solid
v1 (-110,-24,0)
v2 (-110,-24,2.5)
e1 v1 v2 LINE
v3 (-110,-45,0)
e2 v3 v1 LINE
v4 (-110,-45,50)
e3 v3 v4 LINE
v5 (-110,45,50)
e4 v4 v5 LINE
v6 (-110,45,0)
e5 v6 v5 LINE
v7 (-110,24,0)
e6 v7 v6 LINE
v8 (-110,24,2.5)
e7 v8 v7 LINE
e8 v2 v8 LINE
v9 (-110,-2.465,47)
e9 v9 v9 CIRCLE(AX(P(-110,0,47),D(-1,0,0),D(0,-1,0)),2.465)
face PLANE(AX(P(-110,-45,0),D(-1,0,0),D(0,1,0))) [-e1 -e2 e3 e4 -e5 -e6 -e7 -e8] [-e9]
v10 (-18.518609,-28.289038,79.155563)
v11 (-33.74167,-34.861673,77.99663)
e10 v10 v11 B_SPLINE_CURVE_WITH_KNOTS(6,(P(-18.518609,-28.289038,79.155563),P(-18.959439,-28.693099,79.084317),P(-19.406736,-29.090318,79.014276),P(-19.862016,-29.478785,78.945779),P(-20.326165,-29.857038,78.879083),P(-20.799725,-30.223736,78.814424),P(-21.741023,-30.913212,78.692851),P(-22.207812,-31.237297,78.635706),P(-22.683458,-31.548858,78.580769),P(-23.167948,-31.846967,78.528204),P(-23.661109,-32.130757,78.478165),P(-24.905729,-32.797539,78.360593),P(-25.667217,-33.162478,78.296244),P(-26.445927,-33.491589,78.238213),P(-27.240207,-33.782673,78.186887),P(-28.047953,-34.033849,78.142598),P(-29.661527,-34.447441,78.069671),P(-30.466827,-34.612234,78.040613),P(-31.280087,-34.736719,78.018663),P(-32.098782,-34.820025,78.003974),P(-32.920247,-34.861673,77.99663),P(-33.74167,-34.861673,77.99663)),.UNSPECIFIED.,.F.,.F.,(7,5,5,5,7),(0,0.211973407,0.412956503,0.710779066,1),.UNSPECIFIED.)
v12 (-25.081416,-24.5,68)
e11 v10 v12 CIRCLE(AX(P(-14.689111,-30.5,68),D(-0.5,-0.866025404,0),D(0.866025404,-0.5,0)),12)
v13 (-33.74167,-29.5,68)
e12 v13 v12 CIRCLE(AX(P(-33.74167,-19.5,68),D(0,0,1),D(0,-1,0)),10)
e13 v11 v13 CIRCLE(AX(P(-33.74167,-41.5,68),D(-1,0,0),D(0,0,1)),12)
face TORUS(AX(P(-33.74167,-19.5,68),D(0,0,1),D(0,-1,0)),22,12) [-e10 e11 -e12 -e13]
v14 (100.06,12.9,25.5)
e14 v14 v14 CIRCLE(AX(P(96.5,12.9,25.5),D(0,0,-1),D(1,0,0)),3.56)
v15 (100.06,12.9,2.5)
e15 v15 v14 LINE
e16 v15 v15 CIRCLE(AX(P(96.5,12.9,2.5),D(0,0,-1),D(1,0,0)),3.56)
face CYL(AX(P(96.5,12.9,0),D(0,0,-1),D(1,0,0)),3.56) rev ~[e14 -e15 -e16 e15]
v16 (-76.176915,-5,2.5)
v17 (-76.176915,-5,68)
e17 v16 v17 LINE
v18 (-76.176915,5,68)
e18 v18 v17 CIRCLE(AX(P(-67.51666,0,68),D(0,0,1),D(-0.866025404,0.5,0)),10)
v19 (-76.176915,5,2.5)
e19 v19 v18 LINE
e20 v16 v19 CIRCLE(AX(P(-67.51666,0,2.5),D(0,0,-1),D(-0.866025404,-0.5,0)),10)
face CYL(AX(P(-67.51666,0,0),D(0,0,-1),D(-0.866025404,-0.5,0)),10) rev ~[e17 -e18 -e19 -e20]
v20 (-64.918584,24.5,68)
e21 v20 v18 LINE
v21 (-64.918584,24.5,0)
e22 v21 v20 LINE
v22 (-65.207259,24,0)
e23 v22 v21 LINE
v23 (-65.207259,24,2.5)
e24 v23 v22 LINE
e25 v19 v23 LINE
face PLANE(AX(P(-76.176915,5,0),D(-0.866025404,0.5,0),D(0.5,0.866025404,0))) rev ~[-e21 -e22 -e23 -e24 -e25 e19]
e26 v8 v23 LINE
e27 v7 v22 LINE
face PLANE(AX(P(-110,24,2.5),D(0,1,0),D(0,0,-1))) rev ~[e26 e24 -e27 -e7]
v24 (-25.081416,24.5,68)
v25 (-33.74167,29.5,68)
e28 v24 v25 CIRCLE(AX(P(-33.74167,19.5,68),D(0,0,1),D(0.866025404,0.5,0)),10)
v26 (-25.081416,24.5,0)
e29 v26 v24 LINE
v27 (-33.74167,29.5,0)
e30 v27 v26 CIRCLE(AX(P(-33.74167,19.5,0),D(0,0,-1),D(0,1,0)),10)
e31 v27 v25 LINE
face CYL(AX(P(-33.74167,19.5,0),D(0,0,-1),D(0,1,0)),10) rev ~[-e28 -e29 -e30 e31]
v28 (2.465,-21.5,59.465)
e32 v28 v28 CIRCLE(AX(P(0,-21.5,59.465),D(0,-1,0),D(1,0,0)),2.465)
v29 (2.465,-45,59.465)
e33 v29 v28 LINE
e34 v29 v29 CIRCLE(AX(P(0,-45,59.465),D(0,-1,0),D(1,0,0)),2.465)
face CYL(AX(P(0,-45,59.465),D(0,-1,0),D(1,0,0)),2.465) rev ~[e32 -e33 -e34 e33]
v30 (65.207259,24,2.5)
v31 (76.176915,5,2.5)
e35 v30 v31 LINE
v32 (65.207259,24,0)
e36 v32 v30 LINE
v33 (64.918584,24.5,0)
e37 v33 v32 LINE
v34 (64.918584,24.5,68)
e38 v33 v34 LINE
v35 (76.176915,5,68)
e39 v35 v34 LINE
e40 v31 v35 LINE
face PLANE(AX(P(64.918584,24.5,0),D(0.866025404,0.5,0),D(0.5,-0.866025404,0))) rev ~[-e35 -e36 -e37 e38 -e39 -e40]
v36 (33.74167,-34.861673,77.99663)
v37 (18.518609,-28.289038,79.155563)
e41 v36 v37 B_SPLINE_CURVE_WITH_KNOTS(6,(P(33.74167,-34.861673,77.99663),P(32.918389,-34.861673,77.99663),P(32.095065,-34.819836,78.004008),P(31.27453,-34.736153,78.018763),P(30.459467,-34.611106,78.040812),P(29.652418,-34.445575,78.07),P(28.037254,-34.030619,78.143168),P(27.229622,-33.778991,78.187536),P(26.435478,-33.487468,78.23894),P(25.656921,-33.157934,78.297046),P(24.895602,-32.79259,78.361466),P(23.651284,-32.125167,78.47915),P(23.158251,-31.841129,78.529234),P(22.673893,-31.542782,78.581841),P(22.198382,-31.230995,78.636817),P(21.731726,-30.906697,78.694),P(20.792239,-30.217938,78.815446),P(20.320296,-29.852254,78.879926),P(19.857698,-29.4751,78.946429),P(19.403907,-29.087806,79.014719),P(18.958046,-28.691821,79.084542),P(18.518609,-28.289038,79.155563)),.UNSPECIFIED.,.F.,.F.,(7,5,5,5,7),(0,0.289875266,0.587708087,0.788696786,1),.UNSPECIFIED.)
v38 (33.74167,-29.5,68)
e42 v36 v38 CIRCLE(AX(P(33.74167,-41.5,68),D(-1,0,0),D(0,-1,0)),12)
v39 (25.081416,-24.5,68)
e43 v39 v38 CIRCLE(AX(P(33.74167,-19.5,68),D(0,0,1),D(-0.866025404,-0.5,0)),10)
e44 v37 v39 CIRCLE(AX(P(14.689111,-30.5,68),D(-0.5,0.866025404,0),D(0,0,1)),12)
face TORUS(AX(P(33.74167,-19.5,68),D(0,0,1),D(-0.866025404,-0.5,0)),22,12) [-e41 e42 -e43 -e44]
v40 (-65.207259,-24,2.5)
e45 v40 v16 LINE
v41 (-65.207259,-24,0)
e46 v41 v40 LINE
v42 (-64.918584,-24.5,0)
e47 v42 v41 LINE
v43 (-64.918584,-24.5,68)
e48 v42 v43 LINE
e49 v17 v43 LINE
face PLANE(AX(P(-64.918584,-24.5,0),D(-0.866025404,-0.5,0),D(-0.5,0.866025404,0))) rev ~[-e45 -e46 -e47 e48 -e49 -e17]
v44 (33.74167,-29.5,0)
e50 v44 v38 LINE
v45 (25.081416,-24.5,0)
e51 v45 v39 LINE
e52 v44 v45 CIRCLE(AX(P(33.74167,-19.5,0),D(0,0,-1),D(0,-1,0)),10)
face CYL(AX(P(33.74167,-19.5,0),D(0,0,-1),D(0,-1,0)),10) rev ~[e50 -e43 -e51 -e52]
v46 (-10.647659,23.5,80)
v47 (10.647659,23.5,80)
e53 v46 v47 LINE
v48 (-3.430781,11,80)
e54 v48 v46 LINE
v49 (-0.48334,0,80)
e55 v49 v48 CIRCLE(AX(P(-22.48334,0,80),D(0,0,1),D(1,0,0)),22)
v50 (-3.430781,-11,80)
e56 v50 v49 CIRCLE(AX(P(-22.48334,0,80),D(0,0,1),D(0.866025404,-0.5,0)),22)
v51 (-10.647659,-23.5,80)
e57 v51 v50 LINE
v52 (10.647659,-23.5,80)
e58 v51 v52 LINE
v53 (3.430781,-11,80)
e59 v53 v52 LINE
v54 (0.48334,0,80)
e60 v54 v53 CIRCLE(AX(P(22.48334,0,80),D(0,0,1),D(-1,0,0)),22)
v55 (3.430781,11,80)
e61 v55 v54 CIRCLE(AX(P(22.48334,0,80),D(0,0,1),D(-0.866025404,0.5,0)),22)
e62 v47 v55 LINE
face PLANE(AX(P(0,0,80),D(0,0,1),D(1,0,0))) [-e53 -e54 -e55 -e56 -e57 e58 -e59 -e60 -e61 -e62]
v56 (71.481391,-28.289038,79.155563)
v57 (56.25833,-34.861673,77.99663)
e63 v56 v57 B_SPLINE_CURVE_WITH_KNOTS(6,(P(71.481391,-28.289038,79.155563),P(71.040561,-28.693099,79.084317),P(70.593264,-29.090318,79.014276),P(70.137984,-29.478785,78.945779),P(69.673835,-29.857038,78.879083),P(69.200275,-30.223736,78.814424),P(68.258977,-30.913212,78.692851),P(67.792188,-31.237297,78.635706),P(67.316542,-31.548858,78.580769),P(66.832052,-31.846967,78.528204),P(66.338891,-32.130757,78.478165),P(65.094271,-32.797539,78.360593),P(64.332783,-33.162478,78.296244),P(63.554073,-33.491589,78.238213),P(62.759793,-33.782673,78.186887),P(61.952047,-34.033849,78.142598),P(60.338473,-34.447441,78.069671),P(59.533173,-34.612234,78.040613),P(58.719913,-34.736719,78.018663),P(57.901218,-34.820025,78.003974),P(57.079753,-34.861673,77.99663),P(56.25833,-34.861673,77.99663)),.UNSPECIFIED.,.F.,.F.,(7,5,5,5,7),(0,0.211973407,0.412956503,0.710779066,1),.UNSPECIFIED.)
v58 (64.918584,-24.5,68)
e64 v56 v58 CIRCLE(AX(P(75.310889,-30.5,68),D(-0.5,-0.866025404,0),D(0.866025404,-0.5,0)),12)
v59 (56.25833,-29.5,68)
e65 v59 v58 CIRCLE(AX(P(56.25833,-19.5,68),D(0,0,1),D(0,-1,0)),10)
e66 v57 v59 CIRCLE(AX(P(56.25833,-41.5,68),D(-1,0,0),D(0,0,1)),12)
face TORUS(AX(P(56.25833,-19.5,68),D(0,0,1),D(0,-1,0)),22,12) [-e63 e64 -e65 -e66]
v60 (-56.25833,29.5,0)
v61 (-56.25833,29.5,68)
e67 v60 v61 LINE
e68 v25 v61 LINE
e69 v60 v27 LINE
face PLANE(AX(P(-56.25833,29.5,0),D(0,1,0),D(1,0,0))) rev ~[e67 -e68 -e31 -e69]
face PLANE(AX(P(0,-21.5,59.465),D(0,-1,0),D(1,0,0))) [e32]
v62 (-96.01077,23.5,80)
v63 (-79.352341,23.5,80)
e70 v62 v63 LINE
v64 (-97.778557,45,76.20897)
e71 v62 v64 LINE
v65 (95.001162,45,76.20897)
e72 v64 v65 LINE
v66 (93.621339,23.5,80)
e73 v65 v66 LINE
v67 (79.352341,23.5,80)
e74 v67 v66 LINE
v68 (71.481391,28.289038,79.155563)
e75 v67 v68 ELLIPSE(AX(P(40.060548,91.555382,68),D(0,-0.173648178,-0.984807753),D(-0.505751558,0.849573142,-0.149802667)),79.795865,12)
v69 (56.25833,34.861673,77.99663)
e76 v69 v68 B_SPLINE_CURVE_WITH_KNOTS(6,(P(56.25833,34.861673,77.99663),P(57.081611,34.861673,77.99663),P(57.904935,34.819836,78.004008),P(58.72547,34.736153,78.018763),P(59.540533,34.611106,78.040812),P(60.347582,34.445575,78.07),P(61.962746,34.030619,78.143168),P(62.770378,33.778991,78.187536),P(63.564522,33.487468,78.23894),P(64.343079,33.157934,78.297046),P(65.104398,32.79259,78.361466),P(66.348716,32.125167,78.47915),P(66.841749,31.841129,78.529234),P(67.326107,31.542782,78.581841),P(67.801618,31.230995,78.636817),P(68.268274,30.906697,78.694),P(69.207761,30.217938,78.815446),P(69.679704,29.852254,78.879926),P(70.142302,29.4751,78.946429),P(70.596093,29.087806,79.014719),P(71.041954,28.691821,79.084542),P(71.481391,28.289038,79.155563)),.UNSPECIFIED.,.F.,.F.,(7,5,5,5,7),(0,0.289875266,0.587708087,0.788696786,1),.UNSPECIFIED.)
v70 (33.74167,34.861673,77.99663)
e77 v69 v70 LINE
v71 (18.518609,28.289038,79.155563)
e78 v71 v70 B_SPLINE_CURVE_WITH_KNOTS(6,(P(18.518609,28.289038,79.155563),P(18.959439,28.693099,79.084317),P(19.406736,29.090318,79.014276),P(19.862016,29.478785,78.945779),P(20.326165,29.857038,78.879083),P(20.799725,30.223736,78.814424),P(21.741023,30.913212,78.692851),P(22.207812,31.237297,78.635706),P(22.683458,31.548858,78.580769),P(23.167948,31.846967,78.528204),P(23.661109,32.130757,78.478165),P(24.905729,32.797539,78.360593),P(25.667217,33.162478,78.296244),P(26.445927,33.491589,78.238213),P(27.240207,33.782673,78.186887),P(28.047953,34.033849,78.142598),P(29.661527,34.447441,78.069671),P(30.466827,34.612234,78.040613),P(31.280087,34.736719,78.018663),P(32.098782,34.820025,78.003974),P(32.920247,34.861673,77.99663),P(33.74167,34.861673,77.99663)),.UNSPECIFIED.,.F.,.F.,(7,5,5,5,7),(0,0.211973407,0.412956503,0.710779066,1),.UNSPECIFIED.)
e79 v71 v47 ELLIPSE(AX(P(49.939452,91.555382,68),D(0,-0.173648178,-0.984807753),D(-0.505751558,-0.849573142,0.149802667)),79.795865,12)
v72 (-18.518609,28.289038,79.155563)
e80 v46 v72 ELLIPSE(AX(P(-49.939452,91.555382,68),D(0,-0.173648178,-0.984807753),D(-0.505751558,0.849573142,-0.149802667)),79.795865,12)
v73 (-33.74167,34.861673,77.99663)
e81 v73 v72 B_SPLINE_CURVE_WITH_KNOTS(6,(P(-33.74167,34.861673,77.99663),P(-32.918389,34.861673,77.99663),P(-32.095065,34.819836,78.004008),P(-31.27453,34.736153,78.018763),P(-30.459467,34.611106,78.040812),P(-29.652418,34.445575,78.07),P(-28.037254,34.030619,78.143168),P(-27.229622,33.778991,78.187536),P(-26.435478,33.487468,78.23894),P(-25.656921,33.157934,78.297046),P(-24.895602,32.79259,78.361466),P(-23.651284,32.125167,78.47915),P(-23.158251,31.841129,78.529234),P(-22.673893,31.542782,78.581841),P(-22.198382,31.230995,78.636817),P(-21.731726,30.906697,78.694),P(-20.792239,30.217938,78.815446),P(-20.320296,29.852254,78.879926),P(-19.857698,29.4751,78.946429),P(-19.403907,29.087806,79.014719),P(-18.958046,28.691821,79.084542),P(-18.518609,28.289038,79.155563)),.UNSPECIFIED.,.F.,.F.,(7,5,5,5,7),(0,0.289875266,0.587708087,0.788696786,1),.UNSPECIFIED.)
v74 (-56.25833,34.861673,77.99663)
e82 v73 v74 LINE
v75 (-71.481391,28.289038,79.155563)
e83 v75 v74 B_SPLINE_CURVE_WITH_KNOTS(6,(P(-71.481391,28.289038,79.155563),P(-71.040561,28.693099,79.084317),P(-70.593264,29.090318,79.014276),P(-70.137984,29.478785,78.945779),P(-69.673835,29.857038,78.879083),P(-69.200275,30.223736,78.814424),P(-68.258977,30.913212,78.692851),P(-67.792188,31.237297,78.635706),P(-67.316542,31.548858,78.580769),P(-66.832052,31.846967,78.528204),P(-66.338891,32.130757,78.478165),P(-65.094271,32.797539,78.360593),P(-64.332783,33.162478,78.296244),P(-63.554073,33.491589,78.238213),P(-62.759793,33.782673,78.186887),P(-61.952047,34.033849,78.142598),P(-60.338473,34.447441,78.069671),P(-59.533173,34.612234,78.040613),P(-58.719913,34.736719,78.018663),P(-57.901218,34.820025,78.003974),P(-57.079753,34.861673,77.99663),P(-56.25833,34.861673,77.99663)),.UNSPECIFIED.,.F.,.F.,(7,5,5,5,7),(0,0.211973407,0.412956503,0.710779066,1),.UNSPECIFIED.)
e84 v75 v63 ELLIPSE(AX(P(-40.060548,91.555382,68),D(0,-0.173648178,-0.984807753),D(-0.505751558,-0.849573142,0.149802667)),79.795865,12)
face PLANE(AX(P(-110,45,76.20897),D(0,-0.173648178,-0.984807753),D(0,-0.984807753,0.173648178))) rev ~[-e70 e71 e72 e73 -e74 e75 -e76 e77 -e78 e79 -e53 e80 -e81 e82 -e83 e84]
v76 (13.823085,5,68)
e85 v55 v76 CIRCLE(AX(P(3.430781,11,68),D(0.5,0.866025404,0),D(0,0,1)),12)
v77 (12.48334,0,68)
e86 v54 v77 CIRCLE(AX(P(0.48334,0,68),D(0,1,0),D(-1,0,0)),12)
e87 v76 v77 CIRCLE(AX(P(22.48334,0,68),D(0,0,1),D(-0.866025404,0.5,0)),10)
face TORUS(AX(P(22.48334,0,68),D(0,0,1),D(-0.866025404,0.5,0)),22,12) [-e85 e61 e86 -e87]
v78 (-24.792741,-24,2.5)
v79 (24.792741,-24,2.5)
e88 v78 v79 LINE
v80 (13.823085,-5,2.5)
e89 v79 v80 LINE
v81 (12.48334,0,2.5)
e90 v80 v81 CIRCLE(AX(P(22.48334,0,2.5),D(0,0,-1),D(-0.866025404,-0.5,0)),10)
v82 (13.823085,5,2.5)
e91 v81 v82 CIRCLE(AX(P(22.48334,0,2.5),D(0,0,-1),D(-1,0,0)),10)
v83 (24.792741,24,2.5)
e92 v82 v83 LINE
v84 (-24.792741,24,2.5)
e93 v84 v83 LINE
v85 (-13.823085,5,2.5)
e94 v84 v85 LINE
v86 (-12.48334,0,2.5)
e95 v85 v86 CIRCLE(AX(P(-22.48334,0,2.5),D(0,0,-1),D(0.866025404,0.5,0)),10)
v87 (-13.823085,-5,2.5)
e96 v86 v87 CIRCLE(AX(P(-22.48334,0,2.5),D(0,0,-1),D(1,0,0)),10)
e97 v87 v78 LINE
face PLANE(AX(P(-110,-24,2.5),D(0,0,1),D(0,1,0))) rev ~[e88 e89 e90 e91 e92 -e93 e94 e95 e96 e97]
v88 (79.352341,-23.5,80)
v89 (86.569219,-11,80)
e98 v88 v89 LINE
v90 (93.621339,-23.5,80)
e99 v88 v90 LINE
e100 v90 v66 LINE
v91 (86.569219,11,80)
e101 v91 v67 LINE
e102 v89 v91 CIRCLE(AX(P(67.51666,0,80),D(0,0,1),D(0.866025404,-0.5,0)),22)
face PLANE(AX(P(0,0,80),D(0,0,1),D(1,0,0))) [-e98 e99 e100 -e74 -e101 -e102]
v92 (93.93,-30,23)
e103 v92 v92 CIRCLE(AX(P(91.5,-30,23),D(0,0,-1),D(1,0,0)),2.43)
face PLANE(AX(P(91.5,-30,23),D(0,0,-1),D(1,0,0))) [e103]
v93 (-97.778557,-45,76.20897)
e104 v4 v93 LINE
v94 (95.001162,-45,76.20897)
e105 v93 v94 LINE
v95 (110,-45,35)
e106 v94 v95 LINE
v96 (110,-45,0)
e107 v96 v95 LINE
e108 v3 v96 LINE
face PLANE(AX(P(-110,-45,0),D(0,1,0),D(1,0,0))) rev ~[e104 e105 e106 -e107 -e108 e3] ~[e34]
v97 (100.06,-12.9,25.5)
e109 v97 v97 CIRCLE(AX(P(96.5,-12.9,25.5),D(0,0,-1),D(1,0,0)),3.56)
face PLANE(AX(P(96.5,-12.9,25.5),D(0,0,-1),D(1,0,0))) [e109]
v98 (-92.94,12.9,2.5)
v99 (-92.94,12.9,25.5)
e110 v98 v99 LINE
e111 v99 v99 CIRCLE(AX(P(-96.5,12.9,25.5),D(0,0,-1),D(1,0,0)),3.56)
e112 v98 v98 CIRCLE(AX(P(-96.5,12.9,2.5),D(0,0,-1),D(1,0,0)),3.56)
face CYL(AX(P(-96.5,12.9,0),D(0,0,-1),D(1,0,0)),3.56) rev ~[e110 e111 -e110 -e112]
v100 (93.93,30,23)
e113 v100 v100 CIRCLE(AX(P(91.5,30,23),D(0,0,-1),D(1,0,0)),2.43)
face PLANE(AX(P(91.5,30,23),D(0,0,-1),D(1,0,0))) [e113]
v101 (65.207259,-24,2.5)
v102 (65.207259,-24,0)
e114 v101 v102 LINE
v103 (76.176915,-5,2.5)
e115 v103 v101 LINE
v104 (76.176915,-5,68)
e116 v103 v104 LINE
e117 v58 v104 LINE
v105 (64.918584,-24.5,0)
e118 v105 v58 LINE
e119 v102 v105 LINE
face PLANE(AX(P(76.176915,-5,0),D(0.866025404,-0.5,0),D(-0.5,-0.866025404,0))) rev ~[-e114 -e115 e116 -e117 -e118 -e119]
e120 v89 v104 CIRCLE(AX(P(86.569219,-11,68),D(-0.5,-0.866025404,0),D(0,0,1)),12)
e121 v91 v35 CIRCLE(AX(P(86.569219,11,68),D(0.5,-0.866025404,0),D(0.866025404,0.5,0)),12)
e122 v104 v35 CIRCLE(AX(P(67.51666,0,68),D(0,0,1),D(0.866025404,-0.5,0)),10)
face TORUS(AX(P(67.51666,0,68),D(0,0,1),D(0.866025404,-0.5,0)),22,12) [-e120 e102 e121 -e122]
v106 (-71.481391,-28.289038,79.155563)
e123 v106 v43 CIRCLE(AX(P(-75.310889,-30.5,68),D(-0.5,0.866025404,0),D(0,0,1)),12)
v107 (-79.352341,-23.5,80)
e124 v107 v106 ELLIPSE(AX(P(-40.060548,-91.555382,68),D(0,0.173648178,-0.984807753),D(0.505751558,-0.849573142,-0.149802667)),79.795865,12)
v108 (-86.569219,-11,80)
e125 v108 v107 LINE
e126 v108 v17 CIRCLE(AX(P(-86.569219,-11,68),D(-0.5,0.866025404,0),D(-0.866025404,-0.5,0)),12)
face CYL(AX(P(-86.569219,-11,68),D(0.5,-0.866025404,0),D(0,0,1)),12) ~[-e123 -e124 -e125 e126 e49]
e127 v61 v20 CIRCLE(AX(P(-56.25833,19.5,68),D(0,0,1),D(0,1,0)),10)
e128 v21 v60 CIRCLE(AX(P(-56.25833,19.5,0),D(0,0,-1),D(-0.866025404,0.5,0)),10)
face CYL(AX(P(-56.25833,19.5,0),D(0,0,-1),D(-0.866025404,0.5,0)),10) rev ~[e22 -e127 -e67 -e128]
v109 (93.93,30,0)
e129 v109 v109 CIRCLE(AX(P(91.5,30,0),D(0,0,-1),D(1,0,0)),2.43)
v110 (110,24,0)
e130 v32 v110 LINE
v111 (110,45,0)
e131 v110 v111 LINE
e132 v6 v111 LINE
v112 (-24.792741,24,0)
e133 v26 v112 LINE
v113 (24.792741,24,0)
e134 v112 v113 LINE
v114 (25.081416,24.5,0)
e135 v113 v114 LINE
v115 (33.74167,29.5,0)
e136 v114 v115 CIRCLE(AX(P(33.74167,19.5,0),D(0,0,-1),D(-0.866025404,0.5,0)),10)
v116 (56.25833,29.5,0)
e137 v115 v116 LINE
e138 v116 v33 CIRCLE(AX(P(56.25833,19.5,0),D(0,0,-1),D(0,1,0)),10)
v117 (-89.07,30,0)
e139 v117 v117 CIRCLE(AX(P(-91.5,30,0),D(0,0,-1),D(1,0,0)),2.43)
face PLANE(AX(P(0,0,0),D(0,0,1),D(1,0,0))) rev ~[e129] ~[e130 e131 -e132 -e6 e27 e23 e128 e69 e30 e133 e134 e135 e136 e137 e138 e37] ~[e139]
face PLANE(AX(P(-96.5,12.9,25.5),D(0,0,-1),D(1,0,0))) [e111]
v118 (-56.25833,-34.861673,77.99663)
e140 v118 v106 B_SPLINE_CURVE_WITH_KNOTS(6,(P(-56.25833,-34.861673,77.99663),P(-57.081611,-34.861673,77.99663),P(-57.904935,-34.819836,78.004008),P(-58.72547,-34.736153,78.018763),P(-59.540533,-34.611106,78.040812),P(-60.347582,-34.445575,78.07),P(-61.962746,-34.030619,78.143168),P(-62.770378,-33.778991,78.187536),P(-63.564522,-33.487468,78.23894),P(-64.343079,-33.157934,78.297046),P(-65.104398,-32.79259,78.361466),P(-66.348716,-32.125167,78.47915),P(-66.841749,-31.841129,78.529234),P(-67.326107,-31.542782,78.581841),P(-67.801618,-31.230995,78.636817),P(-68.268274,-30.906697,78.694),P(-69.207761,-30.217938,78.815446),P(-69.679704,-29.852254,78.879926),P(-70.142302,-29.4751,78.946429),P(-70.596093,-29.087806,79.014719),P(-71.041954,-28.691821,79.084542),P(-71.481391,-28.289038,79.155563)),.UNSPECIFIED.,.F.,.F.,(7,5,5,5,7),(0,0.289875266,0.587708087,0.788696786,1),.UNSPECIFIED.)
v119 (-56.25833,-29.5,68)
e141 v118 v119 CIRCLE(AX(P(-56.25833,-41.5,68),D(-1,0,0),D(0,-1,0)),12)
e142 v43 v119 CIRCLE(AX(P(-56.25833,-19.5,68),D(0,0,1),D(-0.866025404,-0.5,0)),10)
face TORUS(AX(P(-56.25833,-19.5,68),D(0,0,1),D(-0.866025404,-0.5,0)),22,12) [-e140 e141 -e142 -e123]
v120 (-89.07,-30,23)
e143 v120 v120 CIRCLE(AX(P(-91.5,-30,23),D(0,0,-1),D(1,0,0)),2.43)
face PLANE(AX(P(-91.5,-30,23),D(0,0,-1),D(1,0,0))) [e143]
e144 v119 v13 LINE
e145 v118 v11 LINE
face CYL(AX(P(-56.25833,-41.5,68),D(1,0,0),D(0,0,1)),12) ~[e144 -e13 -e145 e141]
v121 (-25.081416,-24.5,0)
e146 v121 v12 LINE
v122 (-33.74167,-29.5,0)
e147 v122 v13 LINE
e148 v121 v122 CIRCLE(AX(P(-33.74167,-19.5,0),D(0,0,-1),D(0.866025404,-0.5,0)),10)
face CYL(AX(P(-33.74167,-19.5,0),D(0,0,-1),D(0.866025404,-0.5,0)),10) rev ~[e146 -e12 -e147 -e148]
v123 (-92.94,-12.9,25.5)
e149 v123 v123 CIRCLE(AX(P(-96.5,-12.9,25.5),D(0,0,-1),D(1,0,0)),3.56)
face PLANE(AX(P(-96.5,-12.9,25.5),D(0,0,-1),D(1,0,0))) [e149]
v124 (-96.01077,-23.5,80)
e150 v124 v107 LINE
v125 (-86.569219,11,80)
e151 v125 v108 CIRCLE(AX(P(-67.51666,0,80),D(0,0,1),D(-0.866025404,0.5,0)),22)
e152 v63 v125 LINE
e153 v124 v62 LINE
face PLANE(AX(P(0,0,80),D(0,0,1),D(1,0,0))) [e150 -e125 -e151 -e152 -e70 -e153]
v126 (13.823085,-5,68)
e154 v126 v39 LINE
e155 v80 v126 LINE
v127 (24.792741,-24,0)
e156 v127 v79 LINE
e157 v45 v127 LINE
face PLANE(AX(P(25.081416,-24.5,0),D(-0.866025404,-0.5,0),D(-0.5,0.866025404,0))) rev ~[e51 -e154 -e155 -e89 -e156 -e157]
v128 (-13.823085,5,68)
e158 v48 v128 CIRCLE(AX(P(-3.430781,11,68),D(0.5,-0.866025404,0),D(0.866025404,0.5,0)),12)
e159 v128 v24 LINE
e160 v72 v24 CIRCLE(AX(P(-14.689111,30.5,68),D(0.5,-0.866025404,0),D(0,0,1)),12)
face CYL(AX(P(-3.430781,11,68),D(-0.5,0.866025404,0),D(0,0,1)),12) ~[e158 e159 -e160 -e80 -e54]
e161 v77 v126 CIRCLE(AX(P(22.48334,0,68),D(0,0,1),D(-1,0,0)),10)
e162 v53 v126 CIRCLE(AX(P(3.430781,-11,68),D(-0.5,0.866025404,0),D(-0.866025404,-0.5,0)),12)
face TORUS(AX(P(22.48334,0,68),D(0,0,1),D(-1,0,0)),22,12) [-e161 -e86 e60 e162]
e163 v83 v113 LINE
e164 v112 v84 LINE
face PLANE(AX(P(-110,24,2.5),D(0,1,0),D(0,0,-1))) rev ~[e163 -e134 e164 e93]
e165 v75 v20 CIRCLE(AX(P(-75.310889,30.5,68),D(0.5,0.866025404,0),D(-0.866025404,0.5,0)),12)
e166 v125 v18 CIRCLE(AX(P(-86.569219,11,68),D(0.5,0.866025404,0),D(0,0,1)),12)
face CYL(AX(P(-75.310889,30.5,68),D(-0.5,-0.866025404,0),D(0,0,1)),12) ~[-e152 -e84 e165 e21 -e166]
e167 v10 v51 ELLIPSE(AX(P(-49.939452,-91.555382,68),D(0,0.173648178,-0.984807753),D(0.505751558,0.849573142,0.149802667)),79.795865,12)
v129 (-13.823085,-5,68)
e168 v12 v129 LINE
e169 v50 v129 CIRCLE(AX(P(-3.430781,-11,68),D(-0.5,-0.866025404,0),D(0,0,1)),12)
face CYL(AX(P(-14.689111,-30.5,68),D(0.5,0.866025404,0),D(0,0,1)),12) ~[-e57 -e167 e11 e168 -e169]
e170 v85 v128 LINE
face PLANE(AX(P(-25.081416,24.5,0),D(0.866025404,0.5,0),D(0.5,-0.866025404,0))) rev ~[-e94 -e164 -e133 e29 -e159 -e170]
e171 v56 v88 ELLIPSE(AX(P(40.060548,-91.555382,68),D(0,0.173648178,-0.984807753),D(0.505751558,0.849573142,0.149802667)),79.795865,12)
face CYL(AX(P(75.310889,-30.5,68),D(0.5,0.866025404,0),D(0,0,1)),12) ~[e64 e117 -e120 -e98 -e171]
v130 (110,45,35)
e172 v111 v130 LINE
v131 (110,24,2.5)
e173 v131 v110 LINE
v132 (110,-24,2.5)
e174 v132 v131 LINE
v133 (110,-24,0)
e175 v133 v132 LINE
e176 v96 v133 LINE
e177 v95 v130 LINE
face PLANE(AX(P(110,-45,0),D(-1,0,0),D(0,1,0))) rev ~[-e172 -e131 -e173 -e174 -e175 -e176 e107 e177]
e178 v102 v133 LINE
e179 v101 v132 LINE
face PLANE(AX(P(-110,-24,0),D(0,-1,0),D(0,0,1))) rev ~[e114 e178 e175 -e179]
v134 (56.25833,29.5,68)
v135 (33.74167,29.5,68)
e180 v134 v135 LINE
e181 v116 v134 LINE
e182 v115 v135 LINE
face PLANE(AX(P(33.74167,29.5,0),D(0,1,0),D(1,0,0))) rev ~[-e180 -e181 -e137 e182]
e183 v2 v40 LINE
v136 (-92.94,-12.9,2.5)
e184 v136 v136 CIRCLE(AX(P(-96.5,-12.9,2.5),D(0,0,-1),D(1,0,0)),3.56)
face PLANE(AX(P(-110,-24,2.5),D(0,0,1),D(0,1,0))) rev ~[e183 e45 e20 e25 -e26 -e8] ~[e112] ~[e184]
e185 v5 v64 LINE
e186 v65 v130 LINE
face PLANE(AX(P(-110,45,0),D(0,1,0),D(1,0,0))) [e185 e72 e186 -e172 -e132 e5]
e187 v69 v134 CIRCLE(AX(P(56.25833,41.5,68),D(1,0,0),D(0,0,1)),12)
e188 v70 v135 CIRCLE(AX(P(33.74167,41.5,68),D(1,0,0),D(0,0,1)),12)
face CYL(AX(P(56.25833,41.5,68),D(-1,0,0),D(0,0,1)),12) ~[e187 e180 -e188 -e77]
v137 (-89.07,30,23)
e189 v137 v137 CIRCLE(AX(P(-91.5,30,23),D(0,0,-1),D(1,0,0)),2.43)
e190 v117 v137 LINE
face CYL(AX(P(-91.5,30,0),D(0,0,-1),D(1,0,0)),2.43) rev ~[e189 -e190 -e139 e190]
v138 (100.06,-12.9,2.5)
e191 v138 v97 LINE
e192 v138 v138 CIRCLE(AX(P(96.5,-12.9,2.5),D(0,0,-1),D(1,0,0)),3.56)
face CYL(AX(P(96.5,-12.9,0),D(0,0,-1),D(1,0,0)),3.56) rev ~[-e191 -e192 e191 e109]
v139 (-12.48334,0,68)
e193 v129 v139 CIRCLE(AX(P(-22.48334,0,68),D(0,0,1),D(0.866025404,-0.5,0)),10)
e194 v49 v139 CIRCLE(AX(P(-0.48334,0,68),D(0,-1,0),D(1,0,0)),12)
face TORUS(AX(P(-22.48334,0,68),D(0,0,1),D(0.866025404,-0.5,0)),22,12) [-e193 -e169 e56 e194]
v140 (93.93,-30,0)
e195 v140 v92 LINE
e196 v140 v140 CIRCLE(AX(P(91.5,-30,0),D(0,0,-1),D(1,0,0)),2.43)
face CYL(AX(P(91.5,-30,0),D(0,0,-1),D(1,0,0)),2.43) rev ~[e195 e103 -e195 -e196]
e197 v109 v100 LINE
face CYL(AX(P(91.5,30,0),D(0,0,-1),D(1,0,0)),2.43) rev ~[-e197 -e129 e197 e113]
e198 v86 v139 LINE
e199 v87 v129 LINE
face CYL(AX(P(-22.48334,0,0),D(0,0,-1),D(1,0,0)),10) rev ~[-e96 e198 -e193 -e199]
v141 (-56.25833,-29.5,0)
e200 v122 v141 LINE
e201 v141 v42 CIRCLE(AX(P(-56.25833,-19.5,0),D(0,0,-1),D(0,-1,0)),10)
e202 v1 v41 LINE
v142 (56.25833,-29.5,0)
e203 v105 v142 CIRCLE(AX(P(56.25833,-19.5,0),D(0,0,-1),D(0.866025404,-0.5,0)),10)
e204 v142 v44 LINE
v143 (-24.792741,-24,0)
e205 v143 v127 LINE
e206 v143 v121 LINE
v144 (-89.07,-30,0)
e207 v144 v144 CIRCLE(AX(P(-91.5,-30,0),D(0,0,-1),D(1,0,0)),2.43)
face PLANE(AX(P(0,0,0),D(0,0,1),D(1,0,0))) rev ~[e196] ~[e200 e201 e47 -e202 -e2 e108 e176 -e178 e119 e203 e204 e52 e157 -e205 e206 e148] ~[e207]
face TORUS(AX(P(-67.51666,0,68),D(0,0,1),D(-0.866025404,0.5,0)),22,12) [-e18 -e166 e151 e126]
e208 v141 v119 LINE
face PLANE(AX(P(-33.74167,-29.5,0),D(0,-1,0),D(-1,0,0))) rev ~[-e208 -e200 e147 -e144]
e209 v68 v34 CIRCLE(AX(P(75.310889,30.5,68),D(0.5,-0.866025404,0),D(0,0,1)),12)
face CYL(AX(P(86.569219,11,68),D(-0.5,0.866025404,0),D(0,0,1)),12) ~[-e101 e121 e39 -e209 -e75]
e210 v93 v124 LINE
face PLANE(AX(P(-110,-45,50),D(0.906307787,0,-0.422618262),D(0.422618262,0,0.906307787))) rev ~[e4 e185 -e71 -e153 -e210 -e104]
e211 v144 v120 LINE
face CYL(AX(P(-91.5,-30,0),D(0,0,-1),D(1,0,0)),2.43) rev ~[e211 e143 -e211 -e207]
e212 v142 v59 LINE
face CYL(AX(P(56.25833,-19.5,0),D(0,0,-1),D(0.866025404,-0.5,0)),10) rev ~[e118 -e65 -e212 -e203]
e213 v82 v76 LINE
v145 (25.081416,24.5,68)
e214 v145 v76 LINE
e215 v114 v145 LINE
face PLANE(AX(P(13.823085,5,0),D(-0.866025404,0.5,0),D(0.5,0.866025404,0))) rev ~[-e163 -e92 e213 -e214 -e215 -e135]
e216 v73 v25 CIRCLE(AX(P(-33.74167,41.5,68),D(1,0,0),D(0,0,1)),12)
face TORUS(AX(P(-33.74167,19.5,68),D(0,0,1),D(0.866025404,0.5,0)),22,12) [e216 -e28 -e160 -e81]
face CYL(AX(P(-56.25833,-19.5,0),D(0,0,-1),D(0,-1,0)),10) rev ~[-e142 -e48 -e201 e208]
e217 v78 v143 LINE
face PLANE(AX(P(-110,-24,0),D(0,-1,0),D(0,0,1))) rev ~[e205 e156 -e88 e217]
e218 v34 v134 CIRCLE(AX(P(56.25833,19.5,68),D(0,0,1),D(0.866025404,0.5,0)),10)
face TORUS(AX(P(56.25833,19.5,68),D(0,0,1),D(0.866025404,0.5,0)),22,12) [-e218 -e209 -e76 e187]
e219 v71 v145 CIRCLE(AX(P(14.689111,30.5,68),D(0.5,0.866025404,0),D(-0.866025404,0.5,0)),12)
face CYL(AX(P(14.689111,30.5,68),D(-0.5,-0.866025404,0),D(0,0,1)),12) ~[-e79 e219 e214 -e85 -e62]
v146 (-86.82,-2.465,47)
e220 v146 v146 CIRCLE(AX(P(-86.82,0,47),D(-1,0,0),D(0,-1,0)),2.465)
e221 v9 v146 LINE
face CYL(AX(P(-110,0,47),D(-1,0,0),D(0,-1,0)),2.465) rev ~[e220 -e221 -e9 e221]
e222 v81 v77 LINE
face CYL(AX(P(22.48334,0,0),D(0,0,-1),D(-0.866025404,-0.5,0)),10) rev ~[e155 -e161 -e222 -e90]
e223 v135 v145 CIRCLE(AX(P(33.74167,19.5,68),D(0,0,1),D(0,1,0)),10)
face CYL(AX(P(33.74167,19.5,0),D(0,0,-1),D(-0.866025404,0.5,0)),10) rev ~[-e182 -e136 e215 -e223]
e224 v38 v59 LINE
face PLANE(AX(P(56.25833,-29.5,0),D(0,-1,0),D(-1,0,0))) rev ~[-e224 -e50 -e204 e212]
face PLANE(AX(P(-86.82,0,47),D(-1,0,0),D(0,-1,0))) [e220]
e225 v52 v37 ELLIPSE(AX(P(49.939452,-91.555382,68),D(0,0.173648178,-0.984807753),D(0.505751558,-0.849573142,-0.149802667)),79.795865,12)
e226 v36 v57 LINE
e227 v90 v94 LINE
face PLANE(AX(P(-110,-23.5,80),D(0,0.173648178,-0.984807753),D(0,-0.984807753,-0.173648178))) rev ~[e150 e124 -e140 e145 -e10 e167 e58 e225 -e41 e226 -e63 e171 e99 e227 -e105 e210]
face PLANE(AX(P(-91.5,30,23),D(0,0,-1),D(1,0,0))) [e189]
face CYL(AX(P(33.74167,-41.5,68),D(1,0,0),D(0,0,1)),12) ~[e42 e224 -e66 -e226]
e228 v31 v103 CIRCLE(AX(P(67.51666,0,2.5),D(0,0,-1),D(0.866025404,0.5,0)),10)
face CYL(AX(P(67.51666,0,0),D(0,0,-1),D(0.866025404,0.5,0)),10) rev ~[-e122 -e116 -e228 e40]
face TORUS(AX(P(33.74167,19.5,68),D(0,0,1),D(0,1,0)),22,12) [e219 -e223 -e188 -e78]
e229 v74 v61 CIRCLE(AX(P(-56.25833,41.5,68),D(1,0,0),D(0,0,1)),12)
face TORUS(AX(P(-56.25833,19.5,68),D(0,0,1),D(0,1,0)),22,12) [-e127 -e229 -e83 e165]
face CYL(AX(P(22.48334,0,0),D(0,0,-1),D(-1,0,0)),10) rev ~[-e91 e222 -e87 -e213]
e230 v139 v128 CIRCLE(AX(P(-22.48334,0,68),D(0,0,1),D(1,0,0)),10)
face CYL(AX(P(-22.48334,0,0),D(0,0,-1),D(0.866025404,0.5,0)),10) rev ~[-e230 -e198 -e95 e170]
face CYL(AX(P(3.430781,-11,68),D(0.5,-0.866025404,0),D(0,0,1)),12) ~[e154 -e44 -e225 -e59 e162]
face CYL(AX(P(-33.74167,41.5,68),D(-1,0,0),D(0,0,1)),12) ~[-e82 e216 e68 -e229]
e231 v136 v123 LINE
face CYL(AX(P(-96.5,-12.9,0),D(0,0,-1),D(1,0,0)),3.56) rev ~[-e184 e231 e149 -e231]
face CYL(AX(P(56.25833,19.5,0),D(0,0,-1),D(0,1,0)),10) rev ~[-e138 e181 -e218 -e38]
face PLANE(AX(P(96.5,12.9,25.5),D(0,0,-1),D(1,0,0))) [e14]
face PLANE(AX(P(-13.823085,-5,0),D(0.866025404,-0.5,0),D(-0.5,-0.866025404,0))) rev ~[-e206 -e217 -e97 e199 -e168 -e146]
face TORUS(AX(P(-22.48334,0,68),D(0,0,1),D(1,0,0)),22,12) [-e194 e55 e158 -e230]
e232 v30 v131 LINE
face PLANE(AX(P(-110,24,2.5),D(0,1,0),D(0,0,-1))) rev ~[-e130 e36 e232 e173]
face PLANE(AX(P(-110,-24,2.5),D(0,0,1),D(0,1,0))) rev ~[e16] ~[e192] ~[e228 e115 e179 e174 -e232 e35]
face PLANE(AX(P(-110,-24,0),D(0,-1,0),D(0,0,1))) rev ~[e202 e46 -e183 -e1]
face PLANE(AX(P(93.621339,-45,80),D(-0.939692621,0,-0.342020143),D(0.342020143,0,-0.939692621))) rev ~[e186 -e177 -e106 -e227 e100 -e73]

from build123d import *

# Parameters (mm, degrees)
F0_W      = 220
F0_H      = 90
F1_DEPTH  = 80
F3_DEPTH  = 80.001
F4_R      = 12
F6_DEPTH  = 90
F8_DEPTH  = 220.001
F9_R      = 2.465
F10_DEPTH = 23.18
F11_R     = 2.465
F12_DEPTH = 23.5
F13_R     = 2.43
F14_DEPTH = 23
F13_R_2   = 3.56
F15_DEPTH = 25.5


# Not quite as in the source:
# - a feature names something its author has since deleted; it is built from what else it names


with BuildPart() as f1:
    # F0 (on Top) → F1 (new body)
    with BuildSketch(Plane.XY):
        Rectangle(F0_W, F0_H)
    extrude(amount=F1_DEPTH)

    # F2 (on face) → F3 (cut, through all)
    with BuildSketch(Plane(origin=(0, 0, 0), x_dir=(1, 0, 0), z_dir=(0, 0, -1))):
        with BuildLine():
            ThreePointArc((-13.8230854638, -5), (-12.8240812387, -2.588190451), (-12.4833395016, 0))
            Line((-12.4833395016, 0), (-45, 0))
            Line((-45, 0), (-45, 29.5))
            Line((-45, 29.5), (-56.2583302492, 29.5))
            ThreePointArc((-56.2583302492, 29.5), (-61.2583302492, 28.1602540378), (-64.918584287, 24.5))
            Line((-64.918584287, 24.5), (-76.1769145362, 5))
            ThreePointArc((-76.1769145362, 5), (-77.5166604984, 0), (-76.1769145362, -5))
            Line((-76.1769145362, -5), (-64.918584287, -24.5))
            ThreePointArc((-64.918584287, -24.5), (-61.2583302492, -28.1602540378), (-56.2583302492, -29.5))
            Line((-56.2583302492, -29.5), (-33.7416697508, -29.5))
            ThreePointArc((-33.7416697508, -29.5), (-28.7416697508, -28.1602540378), (-25.081415713, -24.5))
            Line((-25.081415713, -24.5), (-13.8230854638, -5))
        make_face()
        with BuildLine():
            Line((-45, 0), (-12.4833395016, 0))
            ThreePointArc((-12.4833395016, 0), (-12.8240812387, 2.588190451), (-13.8230854638, 5))
            Line((-13.8230854638, 5), (-25.081415713, 24.5))
            ThreePointArc((-25.081415713, 24.5), (-28.7416697508, 28.1602540378), (-33.7416697508, 29.5))
            Line((-33.7416697508, 29.5), (-45, 29.5))
            Line((-45, 29.5), (-45, 0))
        make_face()
        with BuildLine():
            ThreePointArc((13.8230854638, 5), (12.8240812387, 2.588190451), (12.4833395016, 0))
            Line((12.4833395016, 0), (45, 0))
            Line((45, 0), (45, 29.5))
            Line((45, 29.5), (33.7416697508, 29.5))
            ThreePointArc((33.7416697508, 29.5), (28.7416697508, 28.1602540378), (25.081415713, 24.5))
            Line((25.081415713, 24.5), (13.8230854638, 5))
        make_face()
        with BuildLine():
            Line((45, 0), (12.4833395016, 0))
            ThreePointArc((12.4833395016, 0), (12.8240812387, -2.588190451), (13.8230854638, -5))
            Line((13.8230854638, -5), (25.081415713, -24.5))
            ThreePointArc((25.081415713, -24.5), (28.7416697508, -28.1602540378), (33.7416697508, -29.5))
            Line((33.7416697508, -29.5), (56.2583302492, -29.5))
            ThreePointArc((56.2583302492, -29.5), (61.2583302492, -28.1602540378), (64.918584287, -24.5))
            Line((64.918584287, -24.5), (76.1769145362, -5))
            ThreePointArc((76.1769145362, -5), (77.5166604984, 0), (76.1769145362, 5))
            Line((76.1769145362, 5), (64.918584287, 24.5))
            ThreePointArc((64.918584287, 24.5), (61.2583302492, 28.1602540378), (56.2583302492, 29.5))
            Line((56.2583302492, 29.5), (45, 29.5))
            Line((45, 29.5), (45, 0))
        make_face()
    extrude(amount=-F3_DEPTH, mode=Mode.SUBTRACT)

    # F4
    f4_edges = [f1.edges().sort_by_distance(p)[0] for p in [
        (-45, 29.5, 80),
        (45, 29.5, 80),
    ]]
    fillet(f4_edges, radius=F4_R)

    # F5 (on face) → F6 (cut)
    with BuildSketch(Plane.XZ.offset(45)):
        Polygon((-110, 80), (-110, 50), (-96.0107702554, 80), align=None)
        Polygon((110, 80), (93.621339458, 80), (110, 35), align=None)
    extrude(amount=-F6_DEPTH, mode=Mode.SUBTRACT)

    # F7 (on face) → F8 (cut, through all)
    with BuildSketch(Plane(origin=(-110, 0, 0), x_dir=(0, -1, 0), z_dir=(-1, 0, 0))):
        Polygon((-23.5, 80), (-45, 80), (-45, 76.2089699148), align=None)
        Polygon((23.5, 80), (45, 76.2089699148), (45, 78.1686380506), (45, 80), align=None)
        Polygon((-24, 0), (0, 0), (24, 0), (24, 2.5), (-24, 2.5), align=None)
    extrude(amount=-F8_DEPTH, mode=Mode.SUBTRACT)

    # F9 (on face) → F10 (cut)
    with BuildSketch(Plane(origin=(-110, 0, 0), x_dir=(0, -1, 0), z_dir=(-1, 0, 0))):
        with Locations((0, 47)):
            Circle(F9_R)
    extrude(amount=-F10_DEPTH, mode=Mode.SUBTRACT)

    # F11 (on face) → F12 (cut)
    with BuildSketch(Plane.XZ.offset(45)):
        with Locations((0, 59.465)):
            Circle(F11_R)
    extrude(amount=-F12_DEPTH, mode=Mode.SUBTRACT)

    # F13 (on face) → F14 (cut)
    with BuildSketch(Plane(origin=(0, 0, 0), x_dir=(1, 0, 0), z_dir=(0, 0, -1))):
        with Locations((-91.5, 30)):
            Circle(F13_R)
        with Locations((91.5, 30)):
            Circle(F13_R)
        with Locations((91.5, -30)):
            Circle(F13_R)
        with Locations((-91.5, -30)):
            Circle(F13_R)
    extrude(amount=-F14_DEPTH, mode=Mode.SUBTRACT)

    # F13 (on face) → F15 (cut)
    with BuildSketch(Plane(origin=(0, 0, 0), x_dir=(1, 0, 0), z_dir=(0, 0, -1))):
        with Locations((-96.5, 12.9)):
            Circle(F13_R_2)
        with Locations((-96.5, -12.9)):
            Circle(F13_R_2)
        with Locations((96.5, -12.9)):
            Circle(F13_R_2)
        with Locations((96.5, 12.9)):
            Circle(F13_R_2)
    extrude(amount=-F15_DEPTH, mode=Mode.SUBTRACT)


solid = f1.part
